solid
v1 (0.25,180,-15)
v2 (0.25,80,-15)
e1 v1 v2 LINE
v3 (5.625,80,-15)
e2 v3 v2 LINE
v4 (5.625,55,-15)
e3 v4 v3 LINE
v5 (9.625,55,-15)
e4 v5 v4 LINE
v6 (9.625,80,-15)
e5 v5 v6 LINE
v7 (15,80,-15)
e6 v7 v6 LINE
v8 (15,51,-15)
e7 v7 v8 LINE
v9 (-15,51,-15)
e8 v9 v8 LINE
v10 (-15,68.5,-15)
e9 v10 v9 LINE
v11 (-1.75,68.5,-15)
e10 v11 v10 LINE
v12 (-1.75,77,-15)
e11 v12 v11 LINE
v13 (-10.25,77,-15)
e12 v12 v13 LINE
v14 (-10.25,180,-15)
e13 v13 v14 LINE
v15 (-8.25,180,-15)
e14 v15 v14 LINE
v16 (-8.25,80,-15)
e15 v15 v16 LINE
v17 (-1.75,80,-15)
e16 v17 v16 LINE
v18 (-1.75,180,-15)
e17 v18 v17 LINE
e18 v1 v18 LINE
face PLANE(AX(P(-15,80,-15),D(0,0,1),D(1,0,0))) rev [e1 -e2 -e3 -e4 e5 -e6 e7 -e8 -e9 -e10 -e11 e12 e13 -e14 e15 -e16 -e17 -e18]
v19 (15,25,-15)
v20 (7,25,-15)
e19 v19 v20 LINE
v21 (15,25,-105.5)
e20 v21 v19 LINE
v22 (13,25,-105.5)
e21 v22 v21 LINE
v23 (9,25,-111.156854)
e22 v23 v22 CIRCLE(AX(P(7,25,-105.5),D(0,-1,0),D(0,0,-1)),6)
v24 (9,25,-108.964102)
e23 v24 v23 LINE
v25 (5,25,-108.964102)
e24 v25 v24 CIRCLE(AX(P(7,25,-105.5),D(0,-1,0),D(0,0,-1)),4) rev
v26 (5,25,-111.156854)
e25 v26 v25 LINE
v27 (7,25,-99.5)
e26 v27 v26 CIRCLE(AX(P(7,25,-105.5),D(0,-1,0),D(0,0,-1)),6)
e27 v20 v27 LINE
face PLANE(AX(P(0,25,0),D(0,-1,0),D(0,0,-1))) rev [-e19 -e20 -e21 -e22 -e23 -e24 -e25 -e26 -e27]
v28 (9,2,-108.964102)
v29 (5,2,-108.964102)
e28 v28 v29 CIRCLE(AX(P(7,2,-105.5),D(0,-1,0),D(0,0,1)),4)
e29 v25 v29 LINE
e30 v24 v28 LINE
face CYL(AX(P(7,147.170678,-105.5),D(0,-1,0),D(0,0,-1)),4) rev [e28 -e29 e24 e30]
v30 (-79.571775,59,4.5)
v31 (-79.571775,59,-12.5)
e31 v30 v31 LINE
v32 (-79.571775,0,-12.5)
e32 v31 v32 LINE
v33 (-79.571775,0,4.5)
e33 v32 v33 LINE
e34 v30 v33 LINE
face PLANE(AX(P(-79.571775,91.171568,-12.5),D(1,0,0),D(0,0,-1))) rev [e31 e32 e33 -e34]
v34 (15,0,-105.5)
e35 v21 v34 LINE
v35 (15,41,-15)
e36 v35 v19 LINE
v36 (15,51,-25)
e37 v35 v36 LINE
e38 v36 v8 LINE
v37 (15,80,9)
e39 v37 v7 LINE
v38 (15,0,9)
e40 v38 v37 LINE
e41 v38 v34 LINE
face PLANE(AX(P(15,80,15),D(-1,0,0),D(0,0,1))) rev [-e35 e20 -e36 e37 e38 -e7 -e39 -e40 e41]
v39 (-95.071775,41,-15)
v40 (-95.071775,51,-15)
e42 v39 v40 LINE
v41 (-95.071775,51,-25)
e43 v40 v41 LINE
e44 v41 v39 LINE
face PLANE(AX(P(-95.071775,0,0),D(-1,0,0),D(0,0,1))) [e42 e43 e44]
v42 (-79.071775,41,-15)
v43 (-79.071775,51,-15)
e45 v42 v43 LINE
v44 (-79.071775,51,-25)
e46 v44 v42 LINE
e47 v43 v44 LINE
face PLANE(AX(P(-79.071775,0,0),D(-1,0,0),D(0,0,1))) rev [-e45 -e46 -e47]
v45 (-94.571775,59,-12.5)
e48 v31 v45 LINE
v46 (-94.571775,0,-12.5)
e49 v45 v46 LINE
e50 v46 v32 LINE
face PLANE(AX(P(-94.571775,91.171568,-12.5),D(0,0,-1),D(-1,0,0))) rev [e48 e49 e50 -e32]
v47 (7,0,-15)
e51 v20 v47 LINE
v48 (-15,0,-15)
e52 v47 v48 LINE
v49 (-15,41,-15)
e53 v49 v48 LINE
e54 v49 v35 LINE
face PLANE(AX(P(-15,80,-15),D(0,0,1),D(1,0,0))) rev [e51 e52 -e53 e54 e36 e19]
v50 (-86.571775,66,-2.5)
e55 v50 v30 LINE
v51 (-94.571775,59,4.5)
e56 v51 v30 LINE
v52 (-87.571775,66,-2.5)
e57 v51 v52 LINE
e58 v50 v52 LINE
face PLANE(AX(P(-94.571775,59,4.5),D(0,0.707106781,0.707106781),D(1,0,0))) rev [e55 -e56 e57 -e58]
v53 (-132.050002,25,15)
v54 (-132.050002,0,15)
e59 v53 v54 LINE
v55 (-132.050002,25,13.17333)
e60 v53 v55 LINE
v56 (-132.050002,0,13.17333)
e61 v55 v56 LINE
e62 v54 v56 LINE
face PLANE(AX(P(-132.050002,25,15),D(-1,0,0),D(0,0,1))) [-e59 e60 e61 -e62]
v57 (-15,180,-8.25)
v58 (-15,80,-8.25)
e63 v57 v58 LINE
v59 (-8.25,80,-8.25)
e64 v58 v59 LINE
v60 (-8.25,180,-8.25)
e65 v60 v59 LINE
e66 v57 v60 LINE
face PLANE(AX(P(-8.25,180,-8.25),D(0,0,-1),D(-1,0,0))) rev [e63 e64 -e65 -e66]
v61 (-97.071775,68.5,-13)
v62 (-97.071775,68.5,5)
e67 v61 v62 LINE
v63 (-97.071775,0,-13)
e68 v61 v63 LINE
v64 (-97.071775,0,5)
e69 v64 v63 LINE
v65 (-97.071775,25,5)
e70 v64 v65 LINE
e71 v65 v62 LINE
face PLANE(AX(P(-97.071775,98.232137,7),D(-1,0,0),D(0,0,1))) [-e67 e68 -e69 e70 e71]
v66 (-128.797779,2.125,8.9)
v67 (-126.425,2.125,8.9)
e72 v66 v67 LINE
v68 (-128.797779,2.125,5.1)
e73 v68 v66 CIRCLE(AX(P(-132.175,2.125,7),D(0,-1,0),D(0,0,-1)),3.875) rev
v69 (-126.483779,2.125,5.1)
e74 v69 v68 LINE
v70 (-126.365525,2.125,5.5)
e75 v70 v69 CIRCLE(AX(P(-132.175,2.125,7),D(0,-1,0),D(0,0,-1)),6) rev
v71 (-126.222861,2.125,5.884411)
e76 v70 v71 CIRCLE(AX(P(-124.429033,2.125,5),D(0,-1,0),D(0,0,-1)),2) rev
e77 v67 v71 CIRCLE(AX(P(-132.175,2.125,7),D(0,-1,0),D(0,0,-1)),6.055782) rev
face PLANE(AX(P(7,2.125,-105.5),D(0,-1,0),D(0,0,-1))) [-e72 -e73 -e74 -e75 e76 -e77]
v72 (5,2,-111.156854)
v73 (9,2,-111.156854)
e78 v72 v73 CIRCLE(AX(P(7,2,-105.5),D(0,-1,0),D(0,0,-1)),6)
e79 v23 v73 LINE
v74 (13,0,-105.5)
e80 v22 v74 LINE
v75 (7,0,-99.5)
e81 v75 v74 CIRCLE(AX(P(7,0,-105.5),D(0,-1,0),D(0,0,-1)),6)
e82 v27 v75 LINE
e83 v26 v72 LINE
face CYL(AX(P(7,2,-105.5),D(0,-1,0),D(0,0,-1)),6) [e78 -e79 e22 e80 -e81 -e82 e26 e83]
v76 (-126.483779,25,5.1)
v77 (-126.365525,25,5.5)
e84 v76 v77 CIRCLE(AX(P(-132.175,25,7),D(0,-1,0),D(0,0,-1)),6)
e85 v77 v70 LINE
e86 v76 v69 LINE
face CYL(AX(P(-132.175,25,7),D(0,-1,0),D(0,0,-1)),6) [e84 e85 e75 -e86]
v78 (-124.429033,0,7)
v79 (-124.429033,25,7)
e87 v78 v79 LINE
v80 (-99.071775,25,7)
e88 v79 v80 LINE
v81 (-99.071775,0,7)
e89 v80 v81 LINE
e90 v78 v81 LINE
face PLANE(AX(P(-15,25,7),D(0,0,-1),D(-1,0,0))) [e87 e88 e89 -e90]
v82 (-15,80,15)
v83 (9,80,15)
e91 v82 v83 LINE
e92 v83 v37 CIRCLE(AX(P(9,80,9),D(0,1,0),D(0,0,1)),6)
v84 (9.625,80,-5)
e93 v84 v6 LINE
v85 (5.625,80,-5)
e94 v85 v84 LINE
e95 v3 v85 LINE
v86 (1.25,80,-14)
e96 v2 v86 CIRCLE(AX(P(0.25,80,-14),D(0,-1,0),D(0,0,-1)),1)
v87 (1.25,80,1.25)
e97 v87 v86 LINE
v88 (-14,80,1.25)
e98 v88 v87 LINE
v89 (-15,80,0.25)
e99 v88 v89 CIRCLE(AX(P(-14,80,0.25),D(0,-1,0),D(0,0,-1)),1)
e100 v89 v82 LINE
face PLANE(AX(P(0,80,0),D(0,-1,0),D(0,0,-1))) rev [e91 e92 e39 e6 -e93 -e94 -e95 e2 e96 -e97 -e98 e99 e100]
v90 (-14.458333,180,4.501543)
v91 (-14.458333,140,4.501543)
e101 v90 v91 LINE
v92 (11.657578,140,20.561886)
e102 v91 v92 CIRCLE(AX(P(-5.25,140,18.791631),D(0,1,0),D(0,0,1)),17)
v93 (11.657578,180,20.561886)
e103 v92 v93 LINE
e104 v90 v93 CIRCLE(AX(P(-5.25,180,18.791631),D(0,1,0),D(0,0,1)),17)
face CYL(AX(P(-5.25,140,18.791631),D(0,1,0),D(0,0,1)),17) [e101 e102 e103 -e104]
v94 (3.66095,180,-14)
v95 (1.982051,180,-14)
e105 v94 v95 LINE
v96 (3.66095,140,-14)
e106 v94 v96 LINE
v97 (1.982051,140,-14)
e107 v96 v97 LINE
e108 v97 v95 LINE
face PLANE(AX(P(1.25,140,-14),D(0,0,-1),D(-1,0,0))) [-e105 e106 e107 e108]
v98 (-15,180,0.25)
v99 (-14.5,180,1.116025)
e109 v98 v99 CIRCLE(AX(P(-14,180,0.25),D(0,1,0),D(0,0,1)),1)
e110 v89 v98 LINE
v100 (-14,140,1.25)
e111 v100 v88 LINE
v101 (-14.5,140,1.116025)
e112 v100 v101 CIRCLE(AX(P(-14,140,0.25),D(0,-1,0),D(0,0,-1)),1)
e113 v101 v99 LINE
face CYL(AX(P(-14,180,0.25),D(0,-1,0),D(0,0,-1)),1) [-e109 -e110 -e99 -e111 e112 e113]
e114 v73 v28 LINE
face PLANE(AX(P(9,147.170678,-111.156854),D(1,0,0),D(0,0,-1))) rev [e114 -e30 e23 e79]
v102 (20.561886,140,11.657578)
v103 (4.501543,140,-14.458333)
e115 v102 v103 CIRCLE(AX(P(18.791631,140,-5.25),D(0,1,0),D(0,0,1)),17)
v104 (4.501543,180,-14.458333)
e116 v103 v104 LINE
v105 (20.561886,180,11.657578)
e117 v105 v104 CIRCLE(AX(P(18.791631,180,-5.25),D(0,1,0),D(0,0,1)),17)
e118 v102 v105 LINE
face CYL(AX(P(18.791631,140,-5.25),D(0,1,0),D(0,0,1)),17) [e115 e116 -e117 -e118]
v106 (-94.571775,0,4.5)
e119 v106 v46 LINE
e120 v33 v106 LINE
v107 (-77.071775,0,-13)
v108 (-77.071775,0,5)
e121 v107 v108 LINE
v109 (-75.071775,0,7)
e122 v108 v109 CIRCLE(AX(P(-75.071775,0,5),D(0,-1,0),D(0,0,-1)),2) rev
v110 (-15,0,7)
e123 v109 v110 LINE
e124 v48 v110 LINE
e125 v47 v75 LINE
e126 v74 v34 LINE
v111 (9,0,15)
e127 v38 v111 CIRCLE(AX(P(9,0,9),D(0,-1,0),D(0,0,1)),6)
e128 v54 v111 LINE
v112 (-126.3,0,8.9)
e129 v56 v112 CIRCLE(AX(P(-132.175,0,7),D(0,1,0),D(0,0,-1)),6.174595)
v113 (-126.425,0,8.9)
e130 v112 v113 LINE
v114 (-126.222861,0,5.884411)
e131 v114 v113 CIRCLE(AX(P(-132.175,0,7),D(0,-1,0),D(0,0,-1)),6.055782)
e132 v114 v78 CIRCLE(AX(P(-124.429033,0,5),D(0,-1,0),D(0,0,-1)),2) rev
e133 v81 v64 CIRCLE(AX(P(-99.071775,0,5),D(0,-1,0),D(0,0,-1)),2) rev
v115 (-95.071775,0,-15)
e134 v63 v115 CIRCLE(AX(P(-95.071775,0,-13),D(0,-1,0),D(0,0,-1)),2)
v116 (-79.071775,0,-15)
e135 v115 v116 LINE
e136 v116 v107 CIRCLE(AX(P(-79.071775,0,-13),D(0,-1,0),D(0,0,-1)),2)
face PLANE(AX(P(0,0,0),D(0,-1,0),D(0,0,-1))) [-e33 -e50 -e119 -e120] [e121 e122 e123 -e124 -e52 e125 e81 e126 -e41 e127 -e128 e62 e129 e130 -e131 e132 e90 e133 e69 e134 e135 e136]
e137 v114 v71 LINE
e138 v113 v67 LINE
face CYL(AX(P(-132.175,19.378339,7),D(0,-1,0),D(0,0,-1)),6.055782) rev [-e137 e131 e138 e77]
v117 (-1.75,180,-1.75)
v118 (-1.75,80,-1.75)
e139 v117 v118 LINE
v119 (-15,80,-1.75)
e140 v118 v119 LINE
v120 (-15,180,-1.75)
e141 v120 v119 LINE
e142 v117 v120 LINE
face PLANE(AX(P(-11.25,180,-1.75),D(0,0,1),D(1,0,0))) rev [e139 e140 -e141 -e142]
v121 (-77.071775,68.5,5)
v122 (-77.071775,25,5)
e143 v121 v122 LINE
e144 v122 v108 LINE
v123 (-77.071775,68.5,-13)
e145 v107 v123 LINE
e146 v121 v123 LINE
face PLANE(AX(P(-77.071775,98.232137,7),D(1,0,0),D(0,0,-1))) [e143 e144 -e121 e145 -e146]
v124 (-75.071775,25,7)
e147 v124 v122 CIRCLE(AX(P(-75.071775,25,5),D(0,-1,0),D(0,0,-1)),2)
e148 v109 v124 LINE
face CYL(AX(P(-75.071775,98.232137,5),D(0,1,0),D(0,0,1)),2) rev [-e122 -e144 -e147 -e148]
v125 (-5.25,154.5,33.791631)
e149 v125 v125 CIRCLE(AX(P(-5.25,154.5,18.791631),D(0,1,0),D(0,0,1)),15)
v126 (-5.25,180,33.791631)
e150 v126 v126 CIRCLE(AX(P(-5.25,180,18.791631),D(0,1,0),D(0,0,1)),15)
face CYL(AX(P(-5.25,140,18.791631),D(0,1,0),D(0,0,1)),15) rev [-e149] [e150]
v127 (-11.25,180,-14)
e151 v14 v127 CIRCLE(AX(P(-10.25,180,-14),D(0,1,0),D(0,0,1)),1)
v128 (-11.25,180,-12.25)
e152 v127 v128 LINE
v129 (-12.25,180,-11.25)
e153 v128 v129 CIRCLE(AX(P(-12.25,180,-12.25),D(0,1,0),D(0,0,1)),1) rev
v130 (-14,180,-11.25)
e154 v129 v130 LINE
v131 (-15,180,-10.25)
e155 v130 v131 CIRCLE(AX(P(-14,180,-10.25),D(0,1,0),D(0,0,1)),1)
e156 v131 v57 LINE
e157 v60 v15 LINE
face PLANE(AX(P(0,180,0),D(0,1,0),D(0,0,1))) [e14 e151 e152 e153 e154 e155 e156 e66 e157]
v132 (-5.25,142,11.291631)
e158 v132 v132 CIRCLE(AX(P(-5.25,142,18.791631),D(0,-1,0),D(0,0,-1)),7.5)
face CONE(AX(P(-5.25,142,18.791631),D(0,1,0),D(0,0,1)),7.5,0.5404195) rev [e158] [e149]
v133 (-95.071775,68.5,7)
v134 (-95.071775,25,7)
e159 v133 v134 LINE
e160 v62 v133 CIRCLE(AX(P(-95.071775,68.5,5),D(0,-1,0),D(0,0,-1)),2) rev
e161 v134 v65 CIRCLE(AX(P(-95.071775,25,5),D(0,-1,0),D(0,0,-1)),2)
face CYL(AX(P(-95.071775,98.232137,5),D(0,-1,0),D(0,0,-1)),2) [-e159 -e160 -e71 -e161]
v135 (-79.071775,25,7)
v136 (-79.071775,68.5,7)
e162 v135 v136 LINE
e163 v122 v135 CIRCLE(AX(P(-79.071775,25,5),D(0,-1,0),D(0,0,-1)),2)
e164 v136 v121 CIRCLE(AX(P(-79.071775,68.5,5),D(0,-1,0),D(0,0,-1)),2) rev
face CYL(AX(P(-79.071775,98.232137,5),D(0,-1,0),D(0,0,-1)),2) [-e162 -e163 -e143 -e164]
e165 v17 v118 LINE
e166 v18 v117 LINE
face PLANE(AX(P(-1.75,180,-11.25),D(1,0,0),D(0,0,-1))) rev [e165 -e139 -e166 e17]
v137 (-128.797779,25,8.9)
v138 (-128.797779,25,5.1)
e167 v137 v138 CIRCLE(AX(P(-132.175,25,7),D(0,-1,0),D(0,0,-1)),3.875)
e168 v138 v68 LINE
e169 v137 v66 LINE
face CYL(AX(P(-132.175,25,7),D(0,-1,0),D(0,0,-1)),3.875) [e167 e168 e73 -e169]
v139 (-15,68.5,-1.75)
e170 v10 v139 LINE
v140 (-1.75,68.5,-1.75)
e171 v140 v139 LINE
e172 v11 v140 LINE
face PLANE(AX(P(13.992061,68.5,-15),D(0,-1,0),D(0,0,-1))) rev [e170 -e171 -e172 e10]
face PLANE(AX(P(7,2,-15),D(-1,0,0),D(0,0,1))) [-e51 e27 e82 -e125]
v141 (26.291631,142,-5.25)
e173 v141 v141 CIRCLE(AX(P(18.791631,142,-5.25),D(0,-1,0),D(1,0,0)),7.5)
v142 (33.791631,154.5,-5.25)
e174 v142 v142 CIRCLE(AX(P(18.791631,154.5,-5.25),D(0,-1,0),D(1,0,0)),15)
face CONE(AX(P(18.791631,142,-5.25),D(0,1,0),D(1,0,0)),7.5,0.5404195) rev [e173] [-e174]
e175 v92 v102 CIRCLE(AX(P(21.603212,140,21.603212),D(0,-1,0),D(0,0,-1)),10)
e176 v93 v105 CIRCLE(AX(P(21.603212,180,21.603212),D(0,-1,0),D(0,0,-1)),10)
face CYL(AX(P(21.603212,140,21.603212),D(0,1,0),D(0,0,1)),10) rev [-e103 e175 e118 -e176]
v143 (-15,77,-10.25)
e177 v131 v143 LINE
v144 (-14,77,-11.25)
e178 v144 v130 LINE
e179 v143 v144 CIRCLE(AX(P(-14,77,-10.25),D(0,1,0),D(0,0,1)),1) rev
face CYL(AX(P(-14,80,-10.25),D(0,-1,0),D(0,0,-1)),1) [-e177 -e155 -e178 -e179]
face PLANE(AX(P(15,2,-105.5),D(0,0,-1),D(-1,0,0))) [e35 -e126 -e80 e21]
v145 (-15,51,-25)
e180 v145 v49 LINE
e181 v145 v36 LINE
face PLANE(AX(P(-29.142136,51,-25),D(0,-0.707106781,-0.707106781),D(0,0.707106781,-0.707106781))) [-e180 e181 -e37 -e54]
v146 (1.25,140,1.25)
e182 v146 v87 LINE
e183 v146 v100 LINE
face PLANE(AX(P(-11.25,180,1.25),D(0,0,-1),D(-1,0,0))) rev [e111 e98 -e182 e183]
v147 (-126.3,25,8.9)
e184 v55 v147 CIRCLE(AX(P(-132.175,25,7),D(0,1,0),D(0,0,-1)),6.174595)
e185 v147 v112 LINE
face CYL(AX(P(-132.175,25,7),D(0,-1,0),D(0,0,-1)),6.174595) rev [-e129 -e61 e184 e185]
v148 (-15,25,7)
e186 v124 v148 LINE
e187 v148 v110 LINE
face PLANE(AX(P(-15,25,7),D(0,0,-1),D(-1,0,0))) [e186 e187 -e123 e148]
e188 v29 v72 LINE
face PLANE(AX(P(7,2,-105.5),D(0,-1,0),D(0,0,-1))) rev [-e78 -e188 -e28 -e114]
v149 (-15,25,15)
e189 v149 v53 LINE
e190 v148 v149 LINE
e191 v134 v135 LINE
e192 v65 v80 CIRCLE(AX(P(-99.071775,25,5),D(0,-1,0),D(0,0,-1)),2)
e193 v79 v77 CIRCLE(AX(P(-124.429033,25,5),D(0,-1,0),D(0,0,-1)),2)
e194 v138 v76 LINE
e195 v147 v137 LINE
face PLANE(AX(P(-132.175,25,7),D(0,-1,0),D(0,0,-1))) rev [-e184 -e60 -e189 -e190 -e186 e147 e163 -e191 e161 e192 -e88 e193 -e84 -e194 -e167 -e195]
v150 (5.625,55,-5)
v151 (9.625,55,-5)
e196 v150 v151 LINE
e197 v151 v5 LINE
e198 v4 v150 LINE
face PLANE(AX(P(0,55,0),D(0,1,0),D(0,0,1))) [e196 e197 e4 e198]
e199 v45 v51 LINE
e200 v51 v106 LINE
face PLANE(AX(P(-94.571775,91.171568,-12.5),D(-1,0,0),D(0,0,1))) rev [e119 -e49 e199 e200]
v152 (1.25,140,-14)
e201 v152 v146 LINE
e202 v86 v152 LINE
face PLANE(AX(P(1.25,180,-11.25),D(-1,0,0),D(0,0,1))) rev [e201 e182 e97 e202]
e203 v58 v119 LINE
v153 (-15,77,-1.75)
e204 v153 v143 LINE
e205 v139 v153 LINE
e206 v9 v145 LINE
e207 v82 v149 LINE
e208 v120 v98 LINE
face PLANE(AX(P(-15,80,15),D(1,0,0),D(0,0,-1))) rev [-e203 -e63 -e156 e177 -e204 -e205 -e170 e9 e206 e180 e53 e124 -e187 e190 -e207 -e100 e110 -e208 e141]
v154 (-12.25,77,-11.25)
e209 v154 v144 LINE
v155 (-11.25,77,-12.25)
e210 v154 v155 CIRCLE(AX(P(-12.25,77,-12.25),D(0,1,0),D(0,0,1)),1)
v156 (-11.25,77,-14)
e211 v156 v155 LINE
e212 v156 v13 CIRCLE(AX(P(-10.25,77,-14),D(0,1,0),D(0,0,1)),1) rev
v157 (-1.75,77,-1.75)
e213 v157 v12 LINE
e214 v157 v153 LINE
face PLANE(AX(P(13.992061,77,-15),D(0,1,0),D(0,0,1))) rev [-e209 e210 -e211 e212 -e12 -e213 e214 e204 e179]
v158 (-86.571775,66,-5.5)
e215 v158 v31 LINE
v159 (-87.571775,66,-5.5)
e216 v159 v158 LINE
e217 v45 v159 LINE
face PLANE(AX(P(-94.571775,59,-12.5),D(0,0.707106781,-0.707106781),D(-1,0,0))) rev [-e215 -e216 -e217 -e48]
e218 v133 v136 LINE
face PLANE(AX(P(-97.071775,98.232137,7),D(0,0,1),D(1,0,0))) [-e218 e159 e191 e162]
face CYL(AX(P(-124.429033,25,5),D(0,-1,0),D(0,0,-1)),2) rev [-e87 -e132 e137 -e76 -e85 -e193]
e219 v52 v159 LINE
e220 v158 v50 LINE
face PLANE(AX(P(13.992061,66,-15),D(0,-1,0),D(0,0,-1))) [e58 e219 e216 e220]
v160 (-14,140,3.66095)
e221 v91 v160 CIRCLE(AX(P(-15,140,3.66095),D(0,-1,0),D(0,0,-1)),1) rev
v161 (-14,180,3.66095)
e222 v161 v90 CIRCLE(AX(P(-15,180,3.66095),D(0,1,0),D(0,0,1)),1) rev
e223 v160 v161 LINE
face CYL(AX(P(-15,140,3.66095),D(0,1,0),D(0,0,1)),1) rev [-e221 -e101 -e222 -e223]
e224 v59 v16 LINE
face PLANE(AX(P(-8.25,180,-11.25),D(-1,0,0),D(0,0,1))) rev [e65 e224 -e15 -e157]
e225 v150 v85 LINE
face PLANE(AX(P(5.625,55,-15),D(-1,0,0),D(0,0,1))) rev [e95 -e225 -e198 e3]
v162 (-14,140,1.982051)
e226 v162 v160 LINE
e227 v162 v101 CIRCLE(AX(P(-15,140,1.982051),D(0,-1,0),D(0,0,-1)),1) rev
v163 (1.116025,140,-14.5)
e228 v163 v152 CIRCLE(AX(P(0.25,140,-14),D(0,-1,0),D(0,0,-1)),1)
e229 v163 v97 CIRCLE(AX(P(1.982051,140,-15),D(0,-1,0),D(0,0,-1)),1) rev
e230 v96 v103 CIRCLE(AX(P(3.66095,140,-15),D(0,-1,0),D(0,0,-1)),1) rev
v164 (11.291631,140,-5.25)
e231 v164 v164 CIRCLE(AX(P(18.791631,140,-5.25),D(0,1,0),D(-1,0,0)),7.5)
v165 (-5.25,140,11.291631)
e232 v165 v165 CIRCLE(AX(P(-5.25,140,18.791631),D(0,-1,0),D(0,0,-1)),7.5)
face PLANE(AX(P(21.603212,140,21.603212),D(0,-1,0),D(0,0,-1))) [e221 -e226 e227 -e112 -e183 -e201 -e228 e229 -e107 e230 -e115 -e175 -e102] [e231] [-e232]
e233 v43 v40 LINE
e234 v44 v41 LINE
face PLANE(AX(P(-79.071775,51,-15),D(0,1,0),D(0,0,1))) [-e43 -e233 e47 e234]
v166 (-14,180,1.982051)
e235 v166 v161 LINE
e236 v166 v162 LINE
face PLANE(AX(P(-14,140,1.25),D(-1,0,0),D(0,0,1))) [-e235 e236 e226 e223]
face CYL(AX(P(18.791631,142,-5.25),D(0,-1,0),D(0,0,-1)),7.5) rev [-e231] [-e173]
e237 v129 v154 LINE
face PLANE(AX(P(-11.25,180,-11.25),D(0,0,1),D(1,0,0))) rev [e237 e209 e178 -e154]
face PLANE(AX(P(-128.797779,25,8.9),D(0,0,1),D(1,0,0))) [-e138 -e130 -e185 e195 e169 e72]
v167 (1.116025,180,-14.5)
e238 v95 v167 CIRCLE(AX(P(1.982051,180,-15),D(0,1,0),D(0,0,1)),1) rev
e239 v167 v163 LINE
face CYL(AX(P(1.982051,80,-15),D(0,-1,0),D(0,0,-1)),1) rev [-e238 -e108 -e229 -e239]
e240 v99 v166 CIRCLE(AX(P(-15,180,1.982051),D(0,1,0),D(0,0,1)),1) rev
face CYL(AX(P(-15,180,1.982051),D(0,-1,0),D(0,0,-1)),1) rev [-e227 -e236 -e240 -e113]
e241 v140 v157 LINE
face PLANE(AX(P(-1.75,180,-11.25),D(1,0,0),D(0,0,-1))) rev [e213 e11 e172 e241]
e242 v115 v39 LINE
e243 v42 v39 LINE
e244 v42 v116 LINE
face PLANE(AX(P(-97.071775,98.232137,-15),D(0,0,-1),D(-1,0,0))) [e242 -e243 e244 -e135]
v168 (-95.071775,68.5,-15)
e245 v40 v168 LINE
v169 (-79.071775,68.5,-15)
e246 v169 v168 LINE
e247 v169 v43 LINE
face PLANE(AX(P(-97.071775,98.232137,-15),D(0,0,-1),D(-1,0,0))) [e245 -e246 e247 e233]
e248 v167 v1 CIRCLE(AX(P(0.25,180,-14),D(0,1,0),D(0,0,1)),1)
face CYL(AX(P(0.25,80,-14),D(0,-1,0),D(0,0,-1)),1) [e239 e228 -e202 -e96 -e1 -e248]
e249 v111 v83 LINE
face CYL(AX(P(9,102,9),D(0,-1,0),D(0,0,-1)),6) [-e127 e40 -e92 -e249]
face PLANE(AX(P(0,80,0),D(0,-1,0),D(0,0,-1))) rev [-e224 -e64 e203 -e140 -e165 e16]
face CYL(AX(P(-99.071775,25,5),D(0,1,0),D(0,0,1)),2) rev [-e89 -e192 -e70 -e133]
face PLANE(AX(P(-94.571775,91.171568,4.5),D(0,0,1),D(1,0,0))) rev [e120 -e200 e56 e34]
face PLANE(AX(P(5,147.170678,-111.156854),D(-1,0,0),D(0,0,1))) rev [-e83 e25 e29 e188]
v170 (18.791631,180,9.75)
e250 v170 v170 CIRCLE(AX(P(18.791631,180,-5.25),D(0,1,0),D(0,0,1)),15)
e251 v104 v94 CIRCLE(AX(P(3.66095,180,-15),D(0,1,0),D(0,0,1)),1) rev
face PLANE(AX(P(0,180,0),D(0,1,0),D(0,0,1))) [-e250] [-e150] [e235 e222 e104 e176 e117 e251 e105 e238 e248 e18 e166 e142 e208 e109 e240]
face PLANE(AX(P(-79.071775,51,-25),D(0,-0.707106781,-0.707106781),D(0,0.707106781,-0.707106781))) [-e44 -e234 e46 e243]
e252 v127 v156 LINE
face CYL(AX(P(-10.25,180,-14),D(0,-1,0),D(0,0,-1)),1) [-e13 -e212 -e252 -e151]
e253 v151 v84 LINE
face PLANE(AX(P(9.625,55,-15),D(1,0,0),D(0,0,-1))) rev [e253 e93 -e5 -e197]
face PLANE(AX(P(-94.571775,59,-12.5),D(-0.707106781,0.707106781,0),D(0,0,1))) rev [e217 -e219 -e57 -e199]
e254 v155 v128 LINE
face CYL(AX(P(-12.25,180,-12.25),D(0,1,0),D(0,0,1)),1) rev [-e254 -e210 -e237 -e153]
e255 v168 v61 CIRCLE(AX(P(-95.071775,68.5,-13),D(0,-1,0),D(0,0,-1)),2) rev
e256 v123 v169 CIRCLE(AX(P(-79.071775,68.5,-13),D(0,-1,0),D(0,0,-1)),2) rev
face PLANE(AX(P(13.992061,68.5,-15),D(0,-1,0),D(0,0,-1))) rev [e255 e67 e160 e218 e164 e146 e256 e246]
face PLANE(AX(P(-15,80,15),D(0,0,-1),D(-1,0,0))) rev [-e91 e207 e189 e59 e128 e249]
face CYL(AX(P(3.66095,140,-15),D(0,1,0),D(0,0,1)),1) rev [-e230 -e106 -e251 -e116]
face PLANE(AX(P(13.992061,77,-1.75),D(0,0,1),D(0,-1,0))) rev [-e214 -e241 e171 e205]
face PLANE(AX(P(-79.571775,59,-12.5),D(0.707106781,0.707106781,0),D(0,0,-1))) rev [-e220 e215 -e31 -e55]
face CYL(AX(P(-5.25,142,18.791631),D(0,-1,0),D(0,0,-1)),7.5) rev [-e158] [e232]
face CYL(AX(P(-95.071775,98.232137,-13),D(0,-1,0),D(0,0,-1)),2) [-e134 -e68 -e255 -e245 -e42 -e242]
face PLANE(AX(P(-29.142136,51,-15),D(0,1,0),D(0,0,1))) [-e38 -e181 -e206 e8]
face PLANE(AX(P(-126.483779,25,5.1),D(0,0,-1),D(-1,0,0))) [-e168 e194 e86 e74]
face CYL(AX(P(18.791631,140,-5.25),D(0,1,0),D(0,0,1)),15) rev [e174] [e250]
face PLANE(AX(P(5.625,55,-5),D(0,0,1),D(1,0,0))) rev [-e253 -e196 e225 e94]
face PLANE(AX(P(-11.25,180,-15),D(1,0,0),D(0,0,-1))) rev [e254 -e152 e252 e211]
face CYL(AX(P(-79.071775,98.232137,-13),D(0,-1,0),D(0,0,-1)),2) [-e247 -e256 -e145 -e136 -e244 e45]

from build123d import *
from build123d.topology import SkipClean

# Parameters (mm, degrees)
SKETCH1_W                 = 30
SKETCH1_H                 = 30
BOSS_EXTRUDE1_DEPTH       = 80
SKETCH2_R                 = 6
BOSS_EXTRUDE2_DEPTH       = 22
CUT_EXTRUDE1_DEPTH        = 83.764726786
BOSS_EXTRUDE3_DEPTH       = 100
BOSS_EXTRUDE5_DEPTH       = 2
BOSS_EXTRUDE6_DEPTH       = 23
BOSS_EXTRUDE7_DEPTH       = 25
FILLET1_R                 = 2
SKETCH11_R                = 6.055782361
CUT_EXTRUDE2_DEPTH        = 2.125
SKETCH12_W                = 13.25
SKETCH12_H                = 8.5
CUT_EXTRUDE4_DEPTH        = 13.25
CUT_EXTRUDE5_REACH        = 204.341
SKETCH15_W                = 3.75
SKETCH15_H                = 3.75
FILLET2_R                 = 1
CUT_EXTRUDE7_START        = 22
SKETCH16_R                = 6
CUT_EXTRUDE7_DEPTH        = 22
SKETCH17_R                = 15
BOSS_EXTRUDE8_DEPTH       = 40
FILLET3_R                 = 1
SKETCH18_R                = 15
SKETCH18_R_2              = 7.5
BOSS_EXTRUDE9_DEPTH       = 2
SKETCH22_W                = 4
SKETCH22_H                = 10
CUT_EXTRUDE8_DEPTH        = 25
BOSS_EXTRUDE10_REACH      = 253.678
SKETCH23_W                = 20
SKETCH23_H                = 22
SKETCH24_W                = 15
SKETCH24_H                = 17
CUT_EXTRUDE9_DEPTH        = 66
FILLET4_R                 = 2
FILLET5_R                 = 2
CHAMFER1_SIZE             = 7
BOSS_EXTRUDE11_DEPTH      = 30
BOSS_EXTRUDE12_DEPTH      = 7.999995
BOSS_EXTRUDE12_DEPTH_BACK = 8.000005


with BuildPart() as part:
    # Sketch1 → Boss-Extrude1 (new body)
    with BuildSketch(Plane(origin=(0, 0, 0), x_dir=(1, 0, 0), z_dir=(0, 1, 0))):
        Rectangle(SKETCH1_W, SKETCH1_H)
    extrude(amount=BOSS_EXTRUDE1_DEPTH)

    # Sketch2 → Boss-Extrude2 (add)
    with BuildSketch(Plane(origin=(0, 80, 0), x_dir=(1, 0, 0), z_dir=(0, 1, 0))):
        with Locations(Location((9, -9, 0), (0, 0, 270))):
            Circle(SKETCH2_R)
    extrude(amount=BOSS_EXTRUDE2_DEPTH)

    # Sketch3 → Cut-Extrude1 (cut, through all)
    with BuildSketch(Plane(origin=(0, 80, 0), x_dir=(1, 0, 0), z_dir=(0, 1, 0))):
        with BuildLine():
            Line((9, -15), (15, -15))
            Line((15, -15), (15, -9))
            ThreePointArc((15, -9), (13.242640687, -13.242640687), (9, -15))
        make_face()
    extrude(amount=-CUT_EXTRUDE1_DEPTH, mode=Mode.SUBTRACT)

    # Sketch4 → Boss-Extrude3 (add)
    with BuildSketch(Plane(origin=(0, 80, 0), x_dir=(1, 0, 0), z_dir=(0, 1, 0))):
        Polygon((-8.25, 11.25), (-8.25, 8.25), (-11.25, 8.25), (-15, 8.25), (-15, 11.25), (-11.25, 11.25), (-11.25, 15), (-8.25, 15), align=None)
        Polygon((-1.75, 1.75), (-11.25, 1.75), (-15, 1.75), (-15, -1.25), (-11.25, -1.25), (1.25, -1.25), (1.25, 11.25), (1.25, 15), (-1.75, 15), (-1.75, 11.25), align=None)
    extrude(amount=BOSS_EXTRUDE3_DEPTH)

    # Sketch6 → Boss-Extrude5 (add)
    with BuildSketch(Plane.XZ):
        with BuildLine():
            Line((15, -15), (7, -15))
            Line((7, -15), (7, -99.5))
            ThreePointArc((7, -99.5), (2.757359313, -109.742640687), (13, -105.5))
            Line((13, -105.5), (15, -105.5))
            Line((15, -105.5), (15, -15))
        make_face()
    extrude(amount=-BOSS_EXTRUDE5_DEPTH)

    # Sketch7 → Boss-Extrude6 (add)
    with SkipClean():  # the faces are left unmerged after this step: merging them gives an invalid solid
        with BuildSketch(Plane(origin=(0, 2, 0), x_dir=(1, 0, 0), z_dir=(0, 1, 0))):
            with BuildLine():
                Line((9, 111.156854249), (9, 108.964101615))
                ThreePointArc((9, 108.964101615), (7, 101.5), (5, 108.964101615))
                Line((5, 108.964101615), (5, 111.156854249))
                ThreePointArc((5, 111.156854249), (1.086408642, 104.485388128), (7, 99.5))
                Line((7, 99.5), (7, 15))
                Line((7, 15), (15, 15))
                Line((15, 15), (15, 105.5))
                Line((15, 105.5), (13, 105.5))
                ThreePointArc((13, 105.5), (11.898979486, 108.964101615), (9, 111.156854249))
            make_face()
        extrude(amount=BOSS_EXTRUDE6_DEPTH)

    # Sketch9 → Boss-Extrude7 (add)
    with SkipClean():  # the faces are left unmerged after this step: merging them gives an invalid solid
        with BuildSketch(Plane.XZ):
            with BuildLine():
                Line((-15, 15), (-15, 7))
                Line((-15, 7), (-126.175, 7))
                ThreePointArc((-126.175, 7), (-126.252697751, 6.037536458), (-126.48377869, 5.1))
                Line((-126.48377869, 5.1), (-128.797778509, 5.1))
                ThreePointArc((-128.797778509, 5.1), (-136.05, 7), (-128.797778509, 8.9))
                Line((-128.797778509, 8.9), (-126.3, 8.9))
                ThreePointArc((-126.3, 8.9), (-128.491885554, 11.955834237), (-132.050001601, 13.173329766))
                Line((-132.050001601, 13.173329766), (-132.050001601, 15))
                Line((-132.050001601, 15), (-15, 15))
            make_face()
        extrude(amount=-BOSS_EXTRUDE7_DEPTH)

    # Fillet1
    fillet1_edges = [part.edges().sort_by_distance(p)[0] for p in [
        (-126.175, 12.5, 7),
    ]]
    fillet(fillet1_edges, radius=FILLET1_R)

    # Sketch11 → Cut-Extrude2 (cut)
    with SkipClean():  # the faces are left unmerged after this step: merging them gives an invalid solid
        with BuildSketch(Plane.XZ):
            with Locations((-132.175, 7)):
                Circle(SKETCH11_R)
        extrude(amount=-CUT_EXTRUDE2_DEPTH, mode=Mode.SUBTRACT)

    # Sketch12 → Cut-Extrude4 (cut)
    with SkipClean():  # the faces are left unmerged after this step: merging them gives an invalid solid
        with BuildSketch(Plane.ZY.offset(15)):
            with Locations((-8.375, 72.75)):
                Rectangle(SKETCH12_W, SKETCH12_H)
        extrude(amount=-CUT_EXTRUDE4_DEPTH, mode=Mode.SUBTRACT)

    # Sketch15 → Cut-Extrude5 (cut, up to next)
    with BuildSketch(Plane(origin=(0, 80, 0), x_dir=(1, 0, 0), z_dir=(0, 1, 0)), mode=Mode.PRIVATE) as cut_extrude5_sk1:
        with Locations((-13.125, 13.125)):
            Rectangle(SKETCH15_W, SKETCH15_H)
    cut_extrude5_tool1 = extrude(cut_extrude5_sk1.sketch, amount=-CUT_EXTRUDE5_REACH, mode=Mode.PRIVATE) & part.part
    add(cut_extrude5_tool1.solids().sort_by_distance((-13.125, 80, -13.125))[0], mode=Mode.SUBTRACT)

    # Fillet2
    fillet2_edges = [part.edges().sort_by_distance(p)[0] for p in [
        (-11.25, 130, -15),
        (-11.25, 130, -11.25),
        (-15, 130, -11.25),
        (-15, 130, 1.25),
        (1.25, 130, -15),
    ]]
    fillet(fillet2_edges, radius=FILLET2_R)

    # Sketch16 → Cut-Extrude7 (cut)
    with SkipClean():  # the faces are left unmerged after this step: merging them gives an invalid solid
        with BuildSketch(Plane(origin=(0, 80, 0), x_dir=(1, 0, 0), z_dir=(0, 1, 0)).offset(CUT_EXTRUDE7_START)):
            with Locations((9, -9)):
                Circle(SKETCH16_R)
        extrude(amount=-CUT_EXTRUDE7_DEPTH, mode=Mode.SUBTRACT)


with BuildPart() as cut_extrude7_kept_piece:
    # of the separate pieces the step leaves, the one the design keeps (cut_extrude7_pieces_kept)
    add(part.part.solids().sort_by_distance((-15, 80, 0.25))[0])

    # Sketch17 → Boss-Extrude8 (add)
    with SkipClean():  # the faces are left unmerged after this step: merging them gives an invalid solid
        with BuildSketch(Plane(origin=(0, 180, 0), x_dir=(1, 0, 0), z_dir=(0, 1, 0))):
            with BuildLine():
                Line((-14, -1.25), (-14, -4.216394713))
                ThreePointArc((-14, -4.216394713), (-14.384018227, -33.129332993), (11.657578086, -20.561885701))
                ThreePointArc((11.657578086, -20.561885701), (14.532144442, -14.532144442), (20.561885701, -11.657578086))
                ThreePointArc((20.561885701, -11.657578086), (33.129332993, 14.384018227), (4.216394713, 14))
                Line((4.216394713, 14), (1.25, 14))
                Line((1.25, 14), (1.25, -1.25))
                Line((1.25, -1.25), (-14, -1.25))
            make_face()
            with Locations(Location((18.79163056, 5.25, 0), (0, 0, 270))):
                Circle(SKETCH17_R, mode=Mode.SUBTRACT)
            with Locations(Location((-5.25, -18.79163056, 0), (0, 0, 270))):
                Circle(SKETCH17_R, mode=Mode.SUBTRACT)
        extrude(amount=-BOSS_EXTRUDE8_DEPTH)

    # Fillet3
    # the kernel refuses this fillet: 1 mm, written as the material it adds along each edge
    with BuildSketch(Plane(origin=(-14, 140, 1.25), x_dir=(-0.9659258262890684, 0, -0.25881904510252046), z_dir=(0, 1, 0))) as fillet3_piece_1:
        with BuildLine():
            CenterArc((0.776457135, 0.965925826), FILLET3_R, 195, 60)
            Line((-0.189468691, 0.707106781), (0, 0))
            ThreePointArc((0, 0), (0.258819045, 0.034074174), (0.51763809, 0))
        make_face()
    extrude(amount=40)
    with BuildSketch(Plane(origin=(-14, 180, 4.216394713), x_dir=(0, 0, -1), z_dir=(0, -1, 0))) as fillet3_piece_2:
        with BuildLine():
            CenterArc((0.555444904, -1), FILLET3_R, 90, 57.202831704)
            ThreePointArc((-0.285148471, -0.458333333), (-0.140754957, -0.230298516), (0, 0))
            Line((0, 0), (0.555444904, 0))
        make_face()
    extrude(amount=40)
    with BuildSketch(Plane(origin=(1.25, 140, -14), x_dir=(-0.2588190451025201, 0, -0.9659258262890685), z_dir=(0, 1, 0))) as fillet3_piece_3:
        with BuildLine():
            CenterArc((0.776457135, -0.965925826), FILLET3_R, 105, 60)
            Line((-0.189468691, -0.707106781), (0, 0))
            ThreePointArc((0, 0), (0.258819045, -0.034074174), (0.51763809, 0))
        make_face()
    extrude(amount=40)
    with BuildSketch(Plane(origin=(4.216394713, 180, -14), x_dir=(-1, 0, 0), z_dir=(0, -1, 0))) as fillet3_piece_4:
        with BuildLine():
            CenterArc((0.555444904, 1), FILLET3_R, 212.797168296, 57.202831704)
            ThreePointArc((-0.285148471, 0.458333333), (-0.140754957, 0.230298516), (0, 0))
            Line((0, 0), (0.555444904, 0))
        make_face()
    extrude(amount=40)

    # Sketch18 → Boss-Extrude9 (add)
    with SkipClean():  # the faces are left unmerged after this step: merging them gives an invalid solid
        with BuildSketch(Plane.XZ.offset(-140)):
            with Locations(Location((-5.25, 18.79163056, 0), (0, 0, 90))):
                Circle(SKETCH18_R)
            with Locations(Location((-5.25, 18.79163056, 0), (0, 0, 270))):
                Circle(SKETCH18_R_2, mode=Mode.SUBTRACT)
        boss_extrude9 = extrude(amount=-BOSS_EXTRUDE9_DEPTH)

    # Sketch21 → Revolve1 (revolve)
    with SkipClean():  # the faces are left unmerged after this step: merging them gives an invalid solid
        with BuildSketch(Plane(origin=(-5.25, 0, 0), x_dir=(0, 0, -1), z_dir=(-1, 0, 0)), mode=Mode.PRIVATE) as revolve1_sk:
            Polygon((-11.29163056, -142), (-3.79163056, -154.5), (-3.79163056, -142), align=None)
        revolve1 = revolve(revolve1_sk.sketch.rotate(Axis((-5.25, 1065, 18.79163056), (0, -1, 0)), 180), axis=Axis((-5.25, 1065, 18.79163056), (0, -1, 0)))

    # Mirror1: Boss-Extrude9, Revolve1 across plane
    with SkipClean():  # the faces are left unmerged after this step: merging them gives an invalid solid
        add(boss_extrude9.mirror(Plane(origin=(0, 0, 0), x_dir=(0.7071067811865478, 0, 0.7071067811865472), z_dir=(0.7071067811865475, 0, -0.7071067811865477))))
        add(revolve1.mirror(Plane(origin=(0, 0, 0), x_dir=(0.7071067811865478, 0, 0.7071067811865472), z_dir=(0.7071067811865475, 0, -0.7071067811865477))))

    # Sketch22 → Cut-Extrude8 (cut)
    with SkipClean():  # the faces are left unmerged after this step: merging them gives an invalid solid
        with BuildSketch(Plane(origin=(0, 80, 0), x_dir=(1, 0, 0), z_dir=(0, 1, 0))):
            with Locations((7.625, 10)):
                Rectangle(SKETCH22_W, SKETCH22_H)
        extrude(amount=-CUT_EXTRUDE8_DEPTH, mode=Mode.SUBTRACT)

    # Boss-Extrude10: up to this face of the body (flat: up to its plane)
    boss_extrude10_end = Plane(cut_extrude7_kept_piece.part.faces().sort_by_distance((-8.375, 68.5, -8.375))[0])
    # Sketch23 → Boss-Extrude10 (add, up to the picked face)
    with BuildSketch(Plane.XZ, mode=Mode.PRIVATE) as boss_extrude10_sk1:
        with Locations((-87.071774981, -4)):
            Rectangle(SKETCH23_W, SKETCH23_H)
    boss_extrude10_tool1 = split(extrude(boss_extrude10_sk1.sketch, amount=-BOSS_EXTRUDE10_REACH, mode=Mode.PRIVATE), bisect_by=boss_extrude10_end, keep=Keep.BOTH, mode=Mode.PRIVATE)
    add(boss_extrude10_tool1.solids().sort_by(Axis((-87.071775, 0, -4), (0, 1, 0)))[0])

    # Sketch24 → Cut-Extrude9 (cut)
    with SkipClean():  # the faces are left unmerged after this step: merging them gives an invalid solid
        with BuildSketch(Plane.XZ):
            with Locations((-87.071774981, -4)):
                Rectangle(SKETCH24_W, SKETCH24_H)
        extrude(amount=-CUT_EXTRUDE9_DEPTH, mode=Mode.SUBTRACT)

    # Fillet4
    fillet4_edges = [cut_extrude7_kept_piece.edges().sort_by_distance(p)[0] for p in [
        (-97.071774981, 34.25, -15),
        (-97.071774981, 12.5, 7),
        (-77.071774981, 12.5, 7),
        (-77.071774981, 34.25, -15),
    ]]
    fillet(fillet4_edges, radius=FILLET4_R)

    # Fillet5
    fillet5_edges = [cut_extrude7_kept_piece.edges().sort_by_distance(p)[0] for p in [
        (-77.071774981, 46.75, 7),
        (-97.071774981, 46.75, 7),
    ]]
    fillet(fillet5_edges, radius=FILLET5_R)

    # Chamfer1
    chamfer1_edges = [cut_extrude7_kept_piece.edges().sort_by_distance(p)[0] for p in [
        (-94.571774981, 66, -4),
        (-87.071774981, 66, 4.5),
        (-79.571774981, 66, -4),
        (-87.071774981, 66, -12.5),
    ]]
    chamfer(chamfer1_edges, length=CHAMFER1_SIZE)

    # Sketch26 → Boss-Extrude11 (add)
    with SkipClean():  # the faces are left unmerged after this step: merging them gives an invalid solid
        with BuildSketch(Plane(origin=(15, 0, 0), x_dir=(0, 0, -1), z_dir=(1, 0, 0))):
            Polygon((15, 51), (25, 51), (15, 41), align=None)
        extrude(amount=-BOSS_EXTRUDE11_DEPTH)

    # Sketch27 → Boss-Extrude12 (add, two sides: drawn at the far end of the back side and taken through both)
    with SkipClean():  # the faces are left unmerged after this step: merging them gives an invalid solid
        with BuildSketch(Plane.ZY.offset(87.071774981).offset(-BOSS_EXTRUDE12_DEPTH_BACK)):
            Polygon((-15, 51), (-25, 51), (-15, 41), align=None)
        extrude(amount=BOSS_EXTRUDE12_DEPTH + BOSS_EXTRUDE12_DEPTH_BACK)


solid = cut_extrude7_kept_piece.part
